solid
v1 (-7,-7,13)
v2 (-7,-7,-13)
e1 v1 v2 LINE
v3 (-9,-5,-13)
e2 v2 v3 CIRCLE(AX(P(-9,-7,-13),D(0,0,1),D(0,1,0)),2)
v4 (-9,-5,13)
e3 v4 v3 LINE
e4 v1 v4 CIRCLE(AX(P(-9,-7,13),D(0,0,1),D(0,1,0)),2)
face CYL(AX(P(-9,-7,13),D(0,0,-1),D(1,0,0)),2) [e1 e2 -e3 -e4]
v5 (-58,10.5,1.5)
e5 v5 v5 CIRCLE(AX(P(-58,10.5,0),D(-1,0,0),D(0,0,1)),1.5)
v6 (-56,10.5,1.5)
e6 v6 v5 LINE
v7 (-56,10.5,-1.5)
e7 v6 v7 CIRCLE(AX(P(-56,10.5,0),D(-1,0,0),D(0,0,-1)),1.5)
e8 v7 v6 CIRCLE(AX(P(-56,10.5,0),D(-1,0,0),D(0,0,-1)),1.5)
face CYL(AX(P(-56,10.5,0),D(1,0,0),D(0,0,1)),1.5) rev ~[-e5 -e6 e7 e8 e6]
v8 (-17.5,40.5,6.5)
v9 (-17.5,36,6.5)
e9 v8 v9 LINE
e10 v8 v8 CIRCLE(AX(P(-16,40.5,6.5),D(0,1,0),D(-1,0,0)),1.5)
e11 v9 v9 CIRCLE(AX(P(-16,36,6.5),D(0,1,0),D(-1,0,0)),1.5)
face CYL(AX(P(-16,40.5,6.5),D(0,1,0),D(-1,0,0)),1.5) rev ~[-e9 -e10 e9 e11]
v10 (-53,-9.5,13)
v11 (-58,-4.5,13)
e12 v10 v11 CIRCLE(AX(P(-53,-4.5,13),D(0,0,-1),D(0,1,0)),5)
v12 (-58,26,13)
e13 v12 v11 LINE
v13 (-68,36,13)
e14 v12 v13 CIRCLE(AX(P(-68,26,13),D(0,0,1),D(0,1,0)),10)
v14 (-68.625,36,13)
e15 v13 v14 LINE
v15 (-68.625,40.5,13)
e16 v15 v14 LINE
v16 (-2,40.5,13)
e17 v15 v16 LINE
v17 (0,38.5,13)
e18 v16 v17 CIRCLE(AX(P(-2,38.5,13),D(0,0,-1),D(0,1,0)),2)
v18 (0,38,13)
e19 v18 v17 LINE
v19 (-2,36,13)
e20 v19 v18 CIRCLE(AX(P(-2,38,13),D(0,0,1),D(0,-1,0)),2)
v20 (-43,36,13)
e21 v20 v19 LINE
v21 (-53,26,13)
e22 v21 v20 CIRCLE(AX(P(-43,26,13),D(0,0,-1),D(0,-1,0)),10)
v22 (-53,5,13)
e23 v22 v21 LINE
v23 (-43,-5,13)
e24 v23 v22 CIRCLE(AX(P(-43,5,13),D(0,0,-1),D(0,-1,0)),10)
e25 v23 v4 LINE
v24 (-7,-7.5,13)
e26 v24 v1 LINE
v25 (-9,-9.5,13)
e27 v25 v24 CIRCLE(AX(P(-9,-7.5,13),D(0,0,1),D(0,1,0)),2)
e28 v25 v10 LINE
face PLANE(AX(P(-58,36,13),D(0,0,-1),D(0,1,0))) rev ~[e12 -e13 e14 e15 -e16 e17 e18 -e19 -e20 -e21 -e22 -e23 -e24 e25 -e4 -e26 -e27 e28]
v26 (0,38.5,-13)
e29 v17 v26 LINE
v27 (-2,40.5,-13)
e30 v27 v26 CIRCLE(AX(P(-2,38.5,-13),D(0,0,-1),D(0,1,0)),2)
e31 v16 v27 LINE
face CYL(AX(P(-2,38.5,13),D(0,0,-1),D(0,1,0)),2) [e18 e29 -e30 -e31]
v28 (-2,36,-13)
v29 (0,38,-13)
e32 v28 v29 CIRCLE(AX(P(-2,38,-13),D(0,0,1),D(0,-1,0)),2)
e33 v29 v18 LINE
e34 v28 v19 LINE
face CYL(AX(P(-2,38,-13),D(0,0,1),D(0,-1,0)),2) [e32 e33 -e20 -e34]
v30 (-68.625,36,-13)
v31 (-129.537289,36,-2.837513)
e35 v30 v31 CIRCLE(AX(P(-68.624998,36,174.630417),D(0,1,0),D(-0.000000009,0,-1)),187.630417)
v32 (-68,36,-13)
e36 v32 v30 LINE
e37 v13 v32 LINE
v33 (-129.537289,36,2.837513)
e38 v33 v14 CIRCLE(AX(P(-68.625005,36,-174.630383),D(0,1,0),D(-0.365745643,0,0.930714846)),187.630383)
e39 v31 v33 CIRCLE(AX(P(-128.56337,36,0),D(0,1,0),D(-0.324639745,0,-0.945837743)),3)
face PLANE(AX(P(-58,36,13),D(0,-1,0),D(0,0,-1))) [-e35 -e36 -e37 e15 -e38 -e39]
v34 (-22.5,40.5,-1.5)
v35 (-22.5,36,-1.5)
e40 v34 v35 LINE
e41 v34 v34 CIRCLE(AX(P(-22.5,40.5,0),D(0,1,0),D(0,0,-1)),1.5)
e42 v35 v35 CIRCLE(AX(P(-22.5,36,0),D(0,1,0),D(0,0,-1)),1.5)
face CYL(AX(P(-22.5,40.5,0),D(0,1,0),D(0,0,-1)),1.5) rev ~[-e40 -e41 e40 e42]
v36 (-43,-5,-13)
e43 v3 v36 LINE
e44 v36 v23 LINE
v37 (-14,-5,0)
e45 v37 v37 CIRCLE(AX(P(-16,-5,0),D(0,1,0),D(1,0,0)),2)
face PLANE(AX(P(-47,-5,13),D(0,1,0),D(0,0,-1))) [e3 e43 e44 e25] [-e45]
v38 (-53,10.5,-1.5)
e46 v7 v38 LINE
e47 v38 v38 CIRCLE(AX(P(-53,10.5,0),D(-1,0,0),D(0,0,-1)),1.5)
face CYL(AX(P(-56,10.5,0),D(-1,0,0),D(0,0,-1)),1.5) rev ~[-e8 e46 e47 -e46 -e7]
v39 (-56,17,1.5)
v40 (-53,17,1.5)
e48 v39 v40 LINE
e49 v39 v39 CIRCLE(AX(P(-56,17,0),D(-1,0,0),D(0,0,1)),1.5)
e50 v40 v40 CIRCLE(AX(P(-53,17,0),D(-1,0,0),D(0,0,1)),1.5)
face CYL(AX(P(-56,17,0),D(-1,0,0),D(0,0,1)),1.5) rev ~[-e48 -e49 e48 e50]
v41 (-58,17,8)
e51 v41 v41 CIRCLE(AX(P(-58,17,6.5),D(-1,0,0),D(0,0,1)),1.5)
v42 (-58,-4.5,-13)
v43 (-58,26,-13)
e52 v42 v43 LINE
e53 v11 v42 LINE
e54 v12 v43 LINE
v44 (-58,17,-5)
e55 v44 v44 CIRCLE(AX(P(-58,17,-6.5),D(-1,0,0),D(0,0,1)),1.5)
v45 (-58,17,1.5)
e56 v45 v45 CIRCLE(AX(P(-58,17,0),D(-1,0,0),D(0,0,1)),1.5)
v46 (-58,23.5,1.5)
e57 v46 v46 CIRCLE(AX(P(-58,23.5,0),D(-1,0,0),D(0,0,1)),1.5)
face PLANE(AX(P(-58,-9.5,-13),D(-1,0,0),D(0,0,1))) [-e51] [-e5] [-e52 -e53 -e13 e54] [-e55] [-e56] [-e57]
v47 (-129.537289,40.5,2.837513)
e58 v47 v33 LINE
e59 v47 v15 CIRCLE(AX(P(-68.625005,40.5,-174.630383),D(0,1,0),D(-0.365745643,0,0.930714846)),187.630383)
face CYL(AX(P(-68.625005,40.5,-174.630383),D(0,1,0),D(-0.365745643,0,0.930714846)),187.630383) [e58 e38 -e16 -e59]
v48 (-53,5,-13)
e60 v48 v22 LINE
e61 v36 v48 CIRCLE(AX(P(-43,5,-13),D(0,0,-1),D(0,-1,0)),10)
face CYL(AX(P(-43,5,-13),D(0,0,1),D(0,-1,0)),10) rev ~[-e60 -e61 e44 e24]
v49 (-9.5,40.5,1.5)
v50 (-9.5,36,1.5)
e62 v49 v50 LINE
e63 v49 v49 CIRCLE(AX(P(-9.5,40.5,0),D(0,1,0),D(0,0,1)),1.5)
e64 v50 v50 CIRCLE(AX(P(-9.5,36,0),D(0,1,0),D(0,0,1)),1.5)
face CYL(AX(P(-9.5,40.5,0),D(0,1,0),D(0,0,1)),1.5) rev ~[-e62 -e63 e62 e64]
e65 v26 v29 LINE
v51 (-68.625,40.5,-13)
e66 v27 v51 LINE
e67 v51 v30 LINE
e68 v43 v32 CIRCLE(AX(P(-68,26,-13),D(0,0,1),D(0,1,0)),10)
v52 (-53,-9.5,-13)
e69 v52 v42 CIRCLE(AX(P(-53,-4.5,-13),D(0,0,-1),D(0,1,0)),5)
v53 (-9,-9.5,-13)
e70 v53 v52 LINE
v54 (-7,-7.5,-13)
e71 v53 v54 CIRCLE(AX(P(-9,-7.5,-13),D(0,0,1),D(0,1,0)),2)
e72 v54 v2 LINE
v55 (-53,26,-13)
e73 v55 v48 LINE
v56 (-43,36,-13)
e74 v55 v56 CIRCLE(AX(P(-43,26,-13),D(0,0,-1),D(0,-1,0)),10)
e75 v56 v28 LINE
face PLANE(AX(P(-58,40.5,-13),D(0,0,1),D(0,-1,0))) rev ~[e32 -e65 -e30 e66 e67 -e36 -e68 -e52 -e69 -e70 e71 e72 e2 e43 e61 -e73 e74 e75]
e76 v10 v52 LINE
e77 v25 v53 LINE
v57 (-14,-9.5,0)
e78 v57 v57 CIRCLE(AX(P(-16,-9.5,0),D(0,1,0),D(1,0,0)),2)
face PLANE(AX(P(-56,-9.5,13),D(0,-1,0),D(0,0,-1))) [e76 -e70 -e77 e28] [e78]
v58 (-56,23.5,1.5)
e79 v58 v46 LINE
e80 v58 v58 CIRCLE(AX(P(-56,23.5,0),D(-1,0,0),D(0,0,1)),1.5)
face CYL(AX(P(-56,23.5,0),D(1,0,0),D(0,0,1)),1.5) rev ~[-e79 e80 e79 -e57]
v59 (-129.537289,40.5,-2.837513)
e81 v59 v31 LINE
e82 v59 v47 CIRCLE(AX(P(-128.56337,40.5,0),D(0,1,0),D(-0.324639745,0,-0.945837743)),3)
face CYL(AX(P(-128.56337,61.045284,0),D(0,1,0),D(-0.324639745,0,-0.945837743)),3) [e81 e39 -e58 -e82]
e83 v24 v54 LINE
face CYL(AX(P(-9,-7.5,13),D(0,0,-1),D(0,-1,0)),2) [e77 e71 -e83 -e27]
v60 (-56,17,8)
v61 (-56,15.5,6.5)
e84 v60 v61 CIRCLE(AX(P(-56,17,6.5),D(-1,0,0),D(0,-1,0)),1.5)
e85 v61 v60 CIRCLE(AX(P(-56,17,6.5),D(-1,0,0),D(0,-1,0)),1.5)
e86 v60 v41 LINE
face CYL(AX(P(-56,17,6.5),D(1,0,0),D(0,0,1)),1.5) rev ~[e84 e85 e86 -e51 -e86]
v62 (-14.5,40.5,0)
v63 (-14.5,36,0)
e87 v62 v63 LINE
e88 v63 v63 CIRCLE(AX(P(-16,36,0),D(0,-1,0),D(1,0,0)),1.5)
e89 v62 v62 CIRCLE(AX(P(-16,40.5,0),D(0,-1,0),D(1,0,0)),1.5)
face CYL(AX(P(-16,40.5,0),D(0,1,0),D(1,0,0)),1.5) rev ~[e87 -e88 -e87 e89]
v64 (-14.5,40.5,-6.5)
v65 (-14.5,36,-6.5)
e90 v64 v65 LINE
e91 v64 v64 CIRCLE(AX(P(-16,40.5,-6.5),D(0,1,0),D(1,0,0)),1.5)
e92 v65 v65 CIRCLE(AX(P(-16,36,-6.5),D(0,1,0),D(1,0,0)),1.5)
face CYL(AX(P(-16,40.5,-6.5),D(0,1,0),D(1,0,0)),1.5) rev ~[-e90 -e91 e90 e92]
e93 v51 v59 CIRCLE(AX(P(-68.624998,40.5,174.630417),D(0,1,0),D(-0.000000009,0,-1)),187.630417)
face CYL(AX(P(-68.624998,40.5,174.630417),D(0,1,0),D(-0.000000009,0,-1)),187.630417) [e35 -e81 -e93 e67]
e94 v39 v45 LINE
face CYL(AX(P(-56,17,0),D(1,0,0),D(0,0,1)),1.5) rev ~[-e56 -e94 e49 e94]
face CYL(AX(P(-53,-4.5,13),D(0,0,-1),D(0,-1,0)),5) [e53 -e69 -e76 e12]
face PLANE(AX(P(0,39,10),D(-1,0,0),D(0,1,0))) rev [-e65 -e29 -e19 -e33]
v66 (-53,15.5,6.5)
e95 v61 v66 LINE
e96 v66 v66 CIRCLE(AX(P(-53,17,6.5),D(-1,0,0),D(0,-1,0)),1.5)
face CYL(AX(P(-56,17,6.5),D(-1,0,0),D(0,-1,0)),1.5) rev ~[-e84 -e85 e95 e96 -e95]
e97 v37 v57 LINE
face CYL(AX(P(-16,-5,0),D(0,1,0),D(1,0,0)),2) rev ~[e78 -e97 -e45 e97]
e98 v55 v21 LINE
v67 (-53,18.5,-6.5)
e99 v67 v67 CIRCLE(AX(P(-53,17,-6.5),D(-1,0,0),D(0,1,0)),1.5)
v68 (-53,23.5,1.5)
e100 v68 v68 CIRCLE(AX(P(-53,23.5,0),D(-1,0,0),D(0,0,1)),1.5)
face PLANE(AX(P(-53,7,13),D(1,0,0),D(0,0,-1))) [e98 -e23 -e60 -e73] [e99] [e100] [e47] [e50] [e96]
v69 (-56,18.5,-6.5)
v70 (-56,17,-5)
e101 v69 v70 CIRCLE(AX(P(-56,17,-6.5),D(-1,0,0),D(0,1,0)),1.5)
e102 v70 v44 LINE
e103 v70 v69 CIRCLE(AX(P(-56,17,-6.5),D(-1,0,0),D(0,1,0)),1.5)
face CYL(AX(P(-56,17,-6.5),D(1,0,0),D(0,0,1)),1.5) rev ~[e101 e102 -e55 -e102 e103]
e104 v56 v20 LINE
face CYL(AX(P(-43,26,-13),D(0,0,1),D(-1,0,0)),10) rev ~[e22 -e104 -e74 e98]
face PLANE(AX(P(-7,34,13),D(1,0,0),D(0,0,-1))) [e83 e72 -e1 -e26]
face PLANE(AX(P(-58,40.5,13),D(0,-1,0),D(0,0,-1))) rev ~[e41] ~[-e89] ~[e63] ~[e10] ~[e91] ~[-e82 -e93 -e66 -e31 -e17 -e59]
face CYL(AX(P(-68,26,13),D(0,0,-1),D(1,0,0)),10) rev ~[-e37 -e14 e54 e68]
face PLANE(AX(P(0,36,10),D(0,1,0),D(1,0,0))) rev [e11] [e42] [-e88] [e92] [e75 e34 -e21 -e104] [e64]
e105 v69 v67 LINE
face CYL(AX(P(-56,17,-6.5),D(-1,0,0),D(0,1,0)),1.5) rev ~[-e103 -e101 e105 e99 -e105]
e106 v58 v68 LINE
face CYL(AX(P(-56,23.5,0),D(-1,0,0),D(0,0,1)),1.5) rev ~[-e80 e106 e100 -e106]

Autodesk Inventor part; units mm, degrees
ref_plane "YZ Plane" through (0, 0, 0) normal (1, 0, 0) x (0, 1, 0)
sketch "Sketch1" plane through (0, 0, 0) normal (0, 0, 1) x (1, 0, 0)
  line L0 (0, 0) -> (-53, 0)
  line L1 (-53, 0) -> (-53, 18)
  line L2 (-53, 18) -> (0, 18) construction
  line L3 (-53, 18) -> (-56, 18)
  line L4 (-56, 18) -> (-56, -3)
  line L5 (-56, -3) -> (0, -3)
  line L6 (0, -3) -> (0, 0)
  dimension "d0" = 18
  dimension "d1" = 3
  dimension "d2" = 3
  dimension "d3" = 56
extrude "Extrusion1" add sketch "Sketch1" along normal blind 10
mirror "Mirror1" about plane through (-34.1948, 1.3052, 0) normal (0, 0, -1) of "Extrusion1"
mirror "Mirror2" about plane through (-53, 18, 0) normal (0, 1, 0) of "Extrusion1", "Mirror1"
sketch "Sketch4" plane through (0, -3, -10) normal (0, 0, -1) x (-1, 0, 0)
  line L0 (0, 3) -> (53, 3) projected
  line L1 (0, 0) -> (0, 3) projected
  line L2 (56, 0) -> (0, 0) projected
  line L3 (56, 42) -> (56, 0) projected
  line L4 (56, 42) -> (0, 42) projected
  line L5 (0, 42) -> (0, 39) projected
  line L6 (0, 39) -> (53, 39) projected
  line L7 (53, 39) -> (53, 3) projected
  line L8 (0, 3) -> (53, 3) projected
  line L9 (0, 0) -> (0, 3) projected
  line L10 (56, 0) -> (0, 0) projected
  line L11 (56, 42) -> (56, 0) projected
  line L12 (56, 42) -> (0, 42) projected
  line L13 (0, 42) -> (0, 39) projected
  line L14 (0, 39) -> (53, 39) projected
  line L15 (53, 39) -> (53, 3) projected
extrude "Extrusion4" add sketch "Sketch4" along normal blind 5
mirror "Mirror3" about plane through (0, 0, 0) normal (0, 0, 1) of "Extrusion4"
sketch "Sketch11" plane through (-56, -3, -15) normal (0, -1, 0) x (1, 0, 0)
  line L0 (56, 0) -> (56, 30) projected
  line L1 (56, 30) -> (0, 30) projected
  line L2 (0, 0) -> (0, 30) projected
  line L3 (56, 0) -> (0, 0) projected
  line L4 (56, 0) -> (56, 30) projected
  line L5 (56, 30) -> (0, 30) projected
  line L6 (0, 0) -> (0, 30) projected
  line L7 (56, 0) -> (0, 0) projected
  point P0 (56, 15)
extrude "Extrusion11" cut sketch "Sketch11" against normal blind 10
sketch "Sketch13" plane through (0, 36, -15) normal (1, 0, 0) x (0, 0, -1)
  line L0 (-30, 3) -> (-28, 3)
  line L1 (-28, 3) -> (-28, -29)
  line L2 (-28, -29) -> (-30, -29)
  line L3 (-30, -29) -> (-30, 3)
  line L4 (-30, -29) -> (0, -29) projected
  point P0 (-15, -36)
  dimension "d65" = 2
extrude "Extrusion13" cut sketch "Sketch13" against normal up to next
mirror "Mirror4" about plane through (0, 0, 0) normal (0, 0, 1) of "Extrusion13"
sketch "Sketch14" plane through (-56, 7, 13) normal (-1, 0, 0) x (0, 0, 1)
  line L0 (-26, 32) -> (-26, 0) projected
  line L1 (-26, 0) -> (0, 0) projected
  line L2 (0, 32) -> (-26, 32) projected
  circle A0 centre (-13, 10) radius 6.5 construction
  line L3 (-13, 10) -> (-26, 10) construction
  line L4 (-13, 10) -> (-13, 32) construction
  circle A1 centre (-13, 10) radius 1.5
  circle A2 centre (-13, 16.5) radius 1.5
  point P0 (-13, -7)
  point P1 (-13, 0)
  dimension "d68" = 13
  dimension "d69" = 22
  dimension "d71" = 3
  dimension "d72" = 3
extrude "Extrusion14" cut sketch "Sketch14" against normal up to next
pattern_circular "Circular Pattern6" count 4 over 360 about axis through (-56, 17, 0) along (1, 0, 0) of "Extrusion14"
sketch "Sketch15" plane through (-53, 36, 13) normal (0, -1, 0) x (1, 0, 0)
  line L0 (53, -26) -> (53, 0) projected
  line L1 (53, 0) -> (0, 0) projected
  circle A0 centre (37, -13) radius 6.5 construction
  line L2 (37, -13) -> (37, 0) construction
  circle A1 centre (37, -6.5) radius 1.5
  circle A2 centre (37, -13) radius 1.5
  point P0 (53, -13)
  point P1 (53, -13)
  dimension "d78" = 13
  dimension "d79" = 16
  dimension "d80" = 3
  dimension "d81" = 3
extrude "Extrusion15" cut sketch "Sketch15" against normal up to next
pattern_circular "Circular Pattern7" count 4 over 360 about axis through (-16, 36, 0) along (0, 1, 0) of "Extrusion15"
sketch "Sketch16" plane through (-56, 7, -15) normal (0, -1, 0) x (1, 0, 0)
  line L0 (0, 2) -> (3, 2) projected
  line L1 (3, 28) -> (3, 2) projected
  line L2 (3, 28) -> (0, 28) projected
  line L3 (0, 2) -> (0, 28) projected
  line L4 (0, 2) -> (3, 2) projected
  line L5 (3, 28) -> (3, 2) projected
  line L6 (3, 28) -> (0, 28) projected
  line L7 (0, 2) -> (0, 28) projected
  point P0 (56, 15)
extrude "Extrusion16" add sketch "Sketch16" along normal blind 14
ref_plane "Work Plane1" through (-47, 34, 13) normal (1, 0, 0) x (0, 0, -1)
sketch "Sketch17" plane through (-47, 34, 13) normal (1, 0, 0) x (0, 0, -1)
  line L0 (0, 0) -> (0, -41) projected
  line L1 (26, -41) -> (0, -41)
  line L2 (0, -41) -> (0, -39)
  line L3 (0, -39) -> (26, -39)
  line L4 (26, -39) -> (26, -41)
  point P0 (13, -34)
  dimension "d92" = 2
extrude "Extrusion17" add sketch "Sketch17" along normal blind 40
ref_plane "Work Plane3" through (-47, -5, 13) normal (0, 1, 0) x (1, 0, 0)
sketch "Sketch18" plane through (-47, -5, 13) normal (0, 1, 0) x (1, 0, 0)
  circle A0 centre (31, 13) radius 1.5 projected
  circle A1 centre (31, 13) radius 2
  point P0 (47, 13)
  dimension "d95" = 4
extrude "Extrusion18" cut sketch "Sketch18" against normal up to next contours A0 | A1
sketch "Sketch23" plane through (0, 36, 13) normal (0, 0, 1) x (1, 0, 0)
  line L0 (0, 0) -> (-53, 0) projected
  line L1 (-56, 3) -> (0, 3) projected
  line L2 (-56, -43) -> (-56, 3) projected
  line L3 (-7, -43) -> (-56, -43) projected
  line L4 (-47, -41) -> (-7, -41) projected
  line L5 (-53, 0) -> (-53, -43) projected
  line L6 (0, 0) -> (-53, 0) projected
  line L7 (0, 3) -> (0, 0) projected
  line L8 (-56, 3) -> (0, 3) projected
  line L9 (-56, -43) -> (-56, 3) projected
  line L10 (-53, -43) -> (-56, -43) projected
  line L11 (0, 0) -> (-56, 0)
  line L12 (-56, 0) -> (-56, 4.5)
  line L13 (-56, 4.5) -> (0, 4.5)
  line L14 (0, 4.5) -> (0, 0)
  line L15 (-7, -41) -> (-56, -41)
  line L16 (-56, -41) -> (-56, -45.5)
  line L17 (-56, -45.5) -> (-7, -45.5)
  line L18 (-7, -45.5) -> (-7, -41)
  point P0 (0, -36)
  dimension "d110" = 3
  dimension "d111" = 2
  dimension "d112" = 1.5
  dimension "d113" = 2.5
sketch "Sketch24" plane through (-56, 39, 13) normal (0, 1, 0) x (1, 0, 0)
  circle A0 centre (40, 19.5) radius 1.5 projected
  circle A1 centre (46.5, 13) radius 1.5 projected
  circle A2 centre (33.5, 13) radius 1.5 projected
  circle A3 centre (40, 6.5) radius 1.5 projected
  circle A4 centre (40, 13) radius 1.5 projected
  line L0 (56, 26) -> (0, 26) projected
  line L1 (0, 0) -> (0, 26) projected
  line L2 (0, 0) -> (56, 0) projected
  line L3 (56, 0) -> (56, 26) projected
  point P0 (56, 13)
  dimension "d114" = 26
extrude "Extrusion22" add sketch "Sketch23" against normal up to surface (26 mm away) contours L0 L11 L2 L1 L7 | L1 L12 L13 L14 | L15 L4 L18 L3 L5 | L5 L3 L2 L15 | L3 L18 L17 L16
sketch "Sketch25" plane through (-53, 36, 13) normal (0, 0, 1) x (1, 0, 0)
  line L0 (-3, 4.5) -> (-3, -45.5) projected
  line L1 (-3, -45.5) -> (46, -45.5) projected
  line L2 (46, -41) -> (46, -45.5) projected
  line L3 (46, -41) -> (0, -41) projected
  line L4 (0, 0) -> (0, -41) projected
  line L5 (53, 0) -> (0, 0) projected
  line L6 (53, 4.5) -> (53, 0) projected
  line L7 (53, 4.5) -> (-3, 4.5) projected
  point P0 (53, -36)
  dimension "d117" = 3
sketch "Sketch26" plane through (-56, -9.5, -13) normal (-1, 0, 0) x (0, 0, 1)
  line L0 (0, 0) -> (0, 50) projected
  line L1 (26, 0) -> (0, 0) projected
  line L2 (26, 50) -> (26, 0) projected
  line L3 (26, 50) -> (0, 50) projected
  circle A0 centre (13, 20) radius 1.5 projected
  circle A1 centre (19.5, 26.5) radius 1.5 projected
  circle A2 centre (6.5, 26.5) radius 1.5 projected
  circle A3 centre (13, 26.5) radius 1.5 projected
  circle A4 centre (13, 33) radius 1.5 projected
  line L4 (0, 0) -> (0, 50) projected
  line L5 (26, 0) -> (0, 0) projected
  line L6 (26, 50) -> (26, 0) projected
  circle A5 centre (13, 20) radius 1.5 projected
  circle A6 centre (19.5, 26.5) radius 1.5 projected
  circle A7 centre (6.5, 26.5) radius 1.5 projected
  circle A8 centre (13, 26.5) radius 1.5 projected
  circle A9 centre (13, 33) radius 1.5 projected
  line L7 (26, 50) -> (0, 50) projected
  point P0 (13, 9.5)
extrude "Extrusion23" add sketch "Sketch26" along normal blind 2
sketch "Sketch27" plane through (0, 40.5, 13) normal (0, 1, 0) x (1, 0, 0)
  line L0 (-58, 26) -> (0, 26) projected
  line L1 (0, 0) -> (0, 26) projected
  circle A0 centre (-16, 13) radius 6.5 construction
  circle A1 centre (-16, 19.5) radius 1.5
  circle A2 centre (-16, 13) radius 1.5
  line L2 (-16, 13) -> (0, 13) construction
  line L3 (-16, 13) -> (-16, 26) construction
  dimension "d121" = 13
  dimension "d120" = 3
  dimension "d122" = 3
  dimension "d123" = 16
extrude "Extrusion24" cut sketch "Sketch27" against normal up to surface (4.5 mm away)
pattern_circular "Circular Pattern8" count 4 over 360 about axis through (-16, 40.5, 0) along (0, -1, 0) of "Extrusion24"
sketch "Sketch28" plane through (-53, -5, 13) normal (0, 1, 0) x (1, 0, 0)
  circle A0 centre (37, 13) radius 1.5 projected
  circle A1 centre (37, 13) radius 2
  point P0 (53, 13)
  dimension "d129" = 4
extrude "Extrusion25" cut sketch "Sketch28" against normal up to next contours A0 | A1
sketch "Sketch29" plane through (-58, -9.5, -13) normal (-1, 0, 0) x (0, 0, 1)
  line L0 (0, 50) -> (0, 0) projected
  line L1 (26, 0) -> (26, 50) projected
  line L2 (26, 50) -> (0, 50) projected
  line L3 (26, 45.5) -> (0, 45.5) projected
  point P0 (13, 9.5)
extrude "Extrusion26" add sketch "Sketch29" along normal blind 79.25
sketch "Sketch30" plane through (0, 40.5, 13) normal (0, 1, 0) x (1, 0, 0)
  line L0 (-137.25, 26) -> (0, 26) projected
  line L1 (-137.25, 0) -> (-137.25, 26) projected
  line L2 (0, 0) -> (-137.25, 0) projected
  arc A0 (-137.25, 13) -> (-68.625, 0) centre (-68.625, 187.6304) ccw
  arc A1 (-68.625, 26) -> (-137.25, 13) centre (-68.625, -161.6304) ccw
  point P0 (0, 13)
extrude "Extrusion27" cut sketch "Sketch30" against normal up to next
fillet "Fillet9" radius 3 1 edges at (-137.25, 38.25, 0)
fillet "Fillet10" radius 10 1 edges at (-58, 36, 0)
fillet "Fillet11" radius 10 1 edges at (-53, 36, 0)
fillet "Fillet12" radius 5 1 edges at (-58, -9.5, 0)
fillet "Fillet13" radius 2 4 edges at (0, 40.5, 0) (0, 36, 0) (-7, -9.5, 0) (-7, -5, 0)
fillet "Fillet14" radius 10 1 edges at (-53, -5, 0)
equation "\"d72\" = d71"
properties part number "CLAW"
